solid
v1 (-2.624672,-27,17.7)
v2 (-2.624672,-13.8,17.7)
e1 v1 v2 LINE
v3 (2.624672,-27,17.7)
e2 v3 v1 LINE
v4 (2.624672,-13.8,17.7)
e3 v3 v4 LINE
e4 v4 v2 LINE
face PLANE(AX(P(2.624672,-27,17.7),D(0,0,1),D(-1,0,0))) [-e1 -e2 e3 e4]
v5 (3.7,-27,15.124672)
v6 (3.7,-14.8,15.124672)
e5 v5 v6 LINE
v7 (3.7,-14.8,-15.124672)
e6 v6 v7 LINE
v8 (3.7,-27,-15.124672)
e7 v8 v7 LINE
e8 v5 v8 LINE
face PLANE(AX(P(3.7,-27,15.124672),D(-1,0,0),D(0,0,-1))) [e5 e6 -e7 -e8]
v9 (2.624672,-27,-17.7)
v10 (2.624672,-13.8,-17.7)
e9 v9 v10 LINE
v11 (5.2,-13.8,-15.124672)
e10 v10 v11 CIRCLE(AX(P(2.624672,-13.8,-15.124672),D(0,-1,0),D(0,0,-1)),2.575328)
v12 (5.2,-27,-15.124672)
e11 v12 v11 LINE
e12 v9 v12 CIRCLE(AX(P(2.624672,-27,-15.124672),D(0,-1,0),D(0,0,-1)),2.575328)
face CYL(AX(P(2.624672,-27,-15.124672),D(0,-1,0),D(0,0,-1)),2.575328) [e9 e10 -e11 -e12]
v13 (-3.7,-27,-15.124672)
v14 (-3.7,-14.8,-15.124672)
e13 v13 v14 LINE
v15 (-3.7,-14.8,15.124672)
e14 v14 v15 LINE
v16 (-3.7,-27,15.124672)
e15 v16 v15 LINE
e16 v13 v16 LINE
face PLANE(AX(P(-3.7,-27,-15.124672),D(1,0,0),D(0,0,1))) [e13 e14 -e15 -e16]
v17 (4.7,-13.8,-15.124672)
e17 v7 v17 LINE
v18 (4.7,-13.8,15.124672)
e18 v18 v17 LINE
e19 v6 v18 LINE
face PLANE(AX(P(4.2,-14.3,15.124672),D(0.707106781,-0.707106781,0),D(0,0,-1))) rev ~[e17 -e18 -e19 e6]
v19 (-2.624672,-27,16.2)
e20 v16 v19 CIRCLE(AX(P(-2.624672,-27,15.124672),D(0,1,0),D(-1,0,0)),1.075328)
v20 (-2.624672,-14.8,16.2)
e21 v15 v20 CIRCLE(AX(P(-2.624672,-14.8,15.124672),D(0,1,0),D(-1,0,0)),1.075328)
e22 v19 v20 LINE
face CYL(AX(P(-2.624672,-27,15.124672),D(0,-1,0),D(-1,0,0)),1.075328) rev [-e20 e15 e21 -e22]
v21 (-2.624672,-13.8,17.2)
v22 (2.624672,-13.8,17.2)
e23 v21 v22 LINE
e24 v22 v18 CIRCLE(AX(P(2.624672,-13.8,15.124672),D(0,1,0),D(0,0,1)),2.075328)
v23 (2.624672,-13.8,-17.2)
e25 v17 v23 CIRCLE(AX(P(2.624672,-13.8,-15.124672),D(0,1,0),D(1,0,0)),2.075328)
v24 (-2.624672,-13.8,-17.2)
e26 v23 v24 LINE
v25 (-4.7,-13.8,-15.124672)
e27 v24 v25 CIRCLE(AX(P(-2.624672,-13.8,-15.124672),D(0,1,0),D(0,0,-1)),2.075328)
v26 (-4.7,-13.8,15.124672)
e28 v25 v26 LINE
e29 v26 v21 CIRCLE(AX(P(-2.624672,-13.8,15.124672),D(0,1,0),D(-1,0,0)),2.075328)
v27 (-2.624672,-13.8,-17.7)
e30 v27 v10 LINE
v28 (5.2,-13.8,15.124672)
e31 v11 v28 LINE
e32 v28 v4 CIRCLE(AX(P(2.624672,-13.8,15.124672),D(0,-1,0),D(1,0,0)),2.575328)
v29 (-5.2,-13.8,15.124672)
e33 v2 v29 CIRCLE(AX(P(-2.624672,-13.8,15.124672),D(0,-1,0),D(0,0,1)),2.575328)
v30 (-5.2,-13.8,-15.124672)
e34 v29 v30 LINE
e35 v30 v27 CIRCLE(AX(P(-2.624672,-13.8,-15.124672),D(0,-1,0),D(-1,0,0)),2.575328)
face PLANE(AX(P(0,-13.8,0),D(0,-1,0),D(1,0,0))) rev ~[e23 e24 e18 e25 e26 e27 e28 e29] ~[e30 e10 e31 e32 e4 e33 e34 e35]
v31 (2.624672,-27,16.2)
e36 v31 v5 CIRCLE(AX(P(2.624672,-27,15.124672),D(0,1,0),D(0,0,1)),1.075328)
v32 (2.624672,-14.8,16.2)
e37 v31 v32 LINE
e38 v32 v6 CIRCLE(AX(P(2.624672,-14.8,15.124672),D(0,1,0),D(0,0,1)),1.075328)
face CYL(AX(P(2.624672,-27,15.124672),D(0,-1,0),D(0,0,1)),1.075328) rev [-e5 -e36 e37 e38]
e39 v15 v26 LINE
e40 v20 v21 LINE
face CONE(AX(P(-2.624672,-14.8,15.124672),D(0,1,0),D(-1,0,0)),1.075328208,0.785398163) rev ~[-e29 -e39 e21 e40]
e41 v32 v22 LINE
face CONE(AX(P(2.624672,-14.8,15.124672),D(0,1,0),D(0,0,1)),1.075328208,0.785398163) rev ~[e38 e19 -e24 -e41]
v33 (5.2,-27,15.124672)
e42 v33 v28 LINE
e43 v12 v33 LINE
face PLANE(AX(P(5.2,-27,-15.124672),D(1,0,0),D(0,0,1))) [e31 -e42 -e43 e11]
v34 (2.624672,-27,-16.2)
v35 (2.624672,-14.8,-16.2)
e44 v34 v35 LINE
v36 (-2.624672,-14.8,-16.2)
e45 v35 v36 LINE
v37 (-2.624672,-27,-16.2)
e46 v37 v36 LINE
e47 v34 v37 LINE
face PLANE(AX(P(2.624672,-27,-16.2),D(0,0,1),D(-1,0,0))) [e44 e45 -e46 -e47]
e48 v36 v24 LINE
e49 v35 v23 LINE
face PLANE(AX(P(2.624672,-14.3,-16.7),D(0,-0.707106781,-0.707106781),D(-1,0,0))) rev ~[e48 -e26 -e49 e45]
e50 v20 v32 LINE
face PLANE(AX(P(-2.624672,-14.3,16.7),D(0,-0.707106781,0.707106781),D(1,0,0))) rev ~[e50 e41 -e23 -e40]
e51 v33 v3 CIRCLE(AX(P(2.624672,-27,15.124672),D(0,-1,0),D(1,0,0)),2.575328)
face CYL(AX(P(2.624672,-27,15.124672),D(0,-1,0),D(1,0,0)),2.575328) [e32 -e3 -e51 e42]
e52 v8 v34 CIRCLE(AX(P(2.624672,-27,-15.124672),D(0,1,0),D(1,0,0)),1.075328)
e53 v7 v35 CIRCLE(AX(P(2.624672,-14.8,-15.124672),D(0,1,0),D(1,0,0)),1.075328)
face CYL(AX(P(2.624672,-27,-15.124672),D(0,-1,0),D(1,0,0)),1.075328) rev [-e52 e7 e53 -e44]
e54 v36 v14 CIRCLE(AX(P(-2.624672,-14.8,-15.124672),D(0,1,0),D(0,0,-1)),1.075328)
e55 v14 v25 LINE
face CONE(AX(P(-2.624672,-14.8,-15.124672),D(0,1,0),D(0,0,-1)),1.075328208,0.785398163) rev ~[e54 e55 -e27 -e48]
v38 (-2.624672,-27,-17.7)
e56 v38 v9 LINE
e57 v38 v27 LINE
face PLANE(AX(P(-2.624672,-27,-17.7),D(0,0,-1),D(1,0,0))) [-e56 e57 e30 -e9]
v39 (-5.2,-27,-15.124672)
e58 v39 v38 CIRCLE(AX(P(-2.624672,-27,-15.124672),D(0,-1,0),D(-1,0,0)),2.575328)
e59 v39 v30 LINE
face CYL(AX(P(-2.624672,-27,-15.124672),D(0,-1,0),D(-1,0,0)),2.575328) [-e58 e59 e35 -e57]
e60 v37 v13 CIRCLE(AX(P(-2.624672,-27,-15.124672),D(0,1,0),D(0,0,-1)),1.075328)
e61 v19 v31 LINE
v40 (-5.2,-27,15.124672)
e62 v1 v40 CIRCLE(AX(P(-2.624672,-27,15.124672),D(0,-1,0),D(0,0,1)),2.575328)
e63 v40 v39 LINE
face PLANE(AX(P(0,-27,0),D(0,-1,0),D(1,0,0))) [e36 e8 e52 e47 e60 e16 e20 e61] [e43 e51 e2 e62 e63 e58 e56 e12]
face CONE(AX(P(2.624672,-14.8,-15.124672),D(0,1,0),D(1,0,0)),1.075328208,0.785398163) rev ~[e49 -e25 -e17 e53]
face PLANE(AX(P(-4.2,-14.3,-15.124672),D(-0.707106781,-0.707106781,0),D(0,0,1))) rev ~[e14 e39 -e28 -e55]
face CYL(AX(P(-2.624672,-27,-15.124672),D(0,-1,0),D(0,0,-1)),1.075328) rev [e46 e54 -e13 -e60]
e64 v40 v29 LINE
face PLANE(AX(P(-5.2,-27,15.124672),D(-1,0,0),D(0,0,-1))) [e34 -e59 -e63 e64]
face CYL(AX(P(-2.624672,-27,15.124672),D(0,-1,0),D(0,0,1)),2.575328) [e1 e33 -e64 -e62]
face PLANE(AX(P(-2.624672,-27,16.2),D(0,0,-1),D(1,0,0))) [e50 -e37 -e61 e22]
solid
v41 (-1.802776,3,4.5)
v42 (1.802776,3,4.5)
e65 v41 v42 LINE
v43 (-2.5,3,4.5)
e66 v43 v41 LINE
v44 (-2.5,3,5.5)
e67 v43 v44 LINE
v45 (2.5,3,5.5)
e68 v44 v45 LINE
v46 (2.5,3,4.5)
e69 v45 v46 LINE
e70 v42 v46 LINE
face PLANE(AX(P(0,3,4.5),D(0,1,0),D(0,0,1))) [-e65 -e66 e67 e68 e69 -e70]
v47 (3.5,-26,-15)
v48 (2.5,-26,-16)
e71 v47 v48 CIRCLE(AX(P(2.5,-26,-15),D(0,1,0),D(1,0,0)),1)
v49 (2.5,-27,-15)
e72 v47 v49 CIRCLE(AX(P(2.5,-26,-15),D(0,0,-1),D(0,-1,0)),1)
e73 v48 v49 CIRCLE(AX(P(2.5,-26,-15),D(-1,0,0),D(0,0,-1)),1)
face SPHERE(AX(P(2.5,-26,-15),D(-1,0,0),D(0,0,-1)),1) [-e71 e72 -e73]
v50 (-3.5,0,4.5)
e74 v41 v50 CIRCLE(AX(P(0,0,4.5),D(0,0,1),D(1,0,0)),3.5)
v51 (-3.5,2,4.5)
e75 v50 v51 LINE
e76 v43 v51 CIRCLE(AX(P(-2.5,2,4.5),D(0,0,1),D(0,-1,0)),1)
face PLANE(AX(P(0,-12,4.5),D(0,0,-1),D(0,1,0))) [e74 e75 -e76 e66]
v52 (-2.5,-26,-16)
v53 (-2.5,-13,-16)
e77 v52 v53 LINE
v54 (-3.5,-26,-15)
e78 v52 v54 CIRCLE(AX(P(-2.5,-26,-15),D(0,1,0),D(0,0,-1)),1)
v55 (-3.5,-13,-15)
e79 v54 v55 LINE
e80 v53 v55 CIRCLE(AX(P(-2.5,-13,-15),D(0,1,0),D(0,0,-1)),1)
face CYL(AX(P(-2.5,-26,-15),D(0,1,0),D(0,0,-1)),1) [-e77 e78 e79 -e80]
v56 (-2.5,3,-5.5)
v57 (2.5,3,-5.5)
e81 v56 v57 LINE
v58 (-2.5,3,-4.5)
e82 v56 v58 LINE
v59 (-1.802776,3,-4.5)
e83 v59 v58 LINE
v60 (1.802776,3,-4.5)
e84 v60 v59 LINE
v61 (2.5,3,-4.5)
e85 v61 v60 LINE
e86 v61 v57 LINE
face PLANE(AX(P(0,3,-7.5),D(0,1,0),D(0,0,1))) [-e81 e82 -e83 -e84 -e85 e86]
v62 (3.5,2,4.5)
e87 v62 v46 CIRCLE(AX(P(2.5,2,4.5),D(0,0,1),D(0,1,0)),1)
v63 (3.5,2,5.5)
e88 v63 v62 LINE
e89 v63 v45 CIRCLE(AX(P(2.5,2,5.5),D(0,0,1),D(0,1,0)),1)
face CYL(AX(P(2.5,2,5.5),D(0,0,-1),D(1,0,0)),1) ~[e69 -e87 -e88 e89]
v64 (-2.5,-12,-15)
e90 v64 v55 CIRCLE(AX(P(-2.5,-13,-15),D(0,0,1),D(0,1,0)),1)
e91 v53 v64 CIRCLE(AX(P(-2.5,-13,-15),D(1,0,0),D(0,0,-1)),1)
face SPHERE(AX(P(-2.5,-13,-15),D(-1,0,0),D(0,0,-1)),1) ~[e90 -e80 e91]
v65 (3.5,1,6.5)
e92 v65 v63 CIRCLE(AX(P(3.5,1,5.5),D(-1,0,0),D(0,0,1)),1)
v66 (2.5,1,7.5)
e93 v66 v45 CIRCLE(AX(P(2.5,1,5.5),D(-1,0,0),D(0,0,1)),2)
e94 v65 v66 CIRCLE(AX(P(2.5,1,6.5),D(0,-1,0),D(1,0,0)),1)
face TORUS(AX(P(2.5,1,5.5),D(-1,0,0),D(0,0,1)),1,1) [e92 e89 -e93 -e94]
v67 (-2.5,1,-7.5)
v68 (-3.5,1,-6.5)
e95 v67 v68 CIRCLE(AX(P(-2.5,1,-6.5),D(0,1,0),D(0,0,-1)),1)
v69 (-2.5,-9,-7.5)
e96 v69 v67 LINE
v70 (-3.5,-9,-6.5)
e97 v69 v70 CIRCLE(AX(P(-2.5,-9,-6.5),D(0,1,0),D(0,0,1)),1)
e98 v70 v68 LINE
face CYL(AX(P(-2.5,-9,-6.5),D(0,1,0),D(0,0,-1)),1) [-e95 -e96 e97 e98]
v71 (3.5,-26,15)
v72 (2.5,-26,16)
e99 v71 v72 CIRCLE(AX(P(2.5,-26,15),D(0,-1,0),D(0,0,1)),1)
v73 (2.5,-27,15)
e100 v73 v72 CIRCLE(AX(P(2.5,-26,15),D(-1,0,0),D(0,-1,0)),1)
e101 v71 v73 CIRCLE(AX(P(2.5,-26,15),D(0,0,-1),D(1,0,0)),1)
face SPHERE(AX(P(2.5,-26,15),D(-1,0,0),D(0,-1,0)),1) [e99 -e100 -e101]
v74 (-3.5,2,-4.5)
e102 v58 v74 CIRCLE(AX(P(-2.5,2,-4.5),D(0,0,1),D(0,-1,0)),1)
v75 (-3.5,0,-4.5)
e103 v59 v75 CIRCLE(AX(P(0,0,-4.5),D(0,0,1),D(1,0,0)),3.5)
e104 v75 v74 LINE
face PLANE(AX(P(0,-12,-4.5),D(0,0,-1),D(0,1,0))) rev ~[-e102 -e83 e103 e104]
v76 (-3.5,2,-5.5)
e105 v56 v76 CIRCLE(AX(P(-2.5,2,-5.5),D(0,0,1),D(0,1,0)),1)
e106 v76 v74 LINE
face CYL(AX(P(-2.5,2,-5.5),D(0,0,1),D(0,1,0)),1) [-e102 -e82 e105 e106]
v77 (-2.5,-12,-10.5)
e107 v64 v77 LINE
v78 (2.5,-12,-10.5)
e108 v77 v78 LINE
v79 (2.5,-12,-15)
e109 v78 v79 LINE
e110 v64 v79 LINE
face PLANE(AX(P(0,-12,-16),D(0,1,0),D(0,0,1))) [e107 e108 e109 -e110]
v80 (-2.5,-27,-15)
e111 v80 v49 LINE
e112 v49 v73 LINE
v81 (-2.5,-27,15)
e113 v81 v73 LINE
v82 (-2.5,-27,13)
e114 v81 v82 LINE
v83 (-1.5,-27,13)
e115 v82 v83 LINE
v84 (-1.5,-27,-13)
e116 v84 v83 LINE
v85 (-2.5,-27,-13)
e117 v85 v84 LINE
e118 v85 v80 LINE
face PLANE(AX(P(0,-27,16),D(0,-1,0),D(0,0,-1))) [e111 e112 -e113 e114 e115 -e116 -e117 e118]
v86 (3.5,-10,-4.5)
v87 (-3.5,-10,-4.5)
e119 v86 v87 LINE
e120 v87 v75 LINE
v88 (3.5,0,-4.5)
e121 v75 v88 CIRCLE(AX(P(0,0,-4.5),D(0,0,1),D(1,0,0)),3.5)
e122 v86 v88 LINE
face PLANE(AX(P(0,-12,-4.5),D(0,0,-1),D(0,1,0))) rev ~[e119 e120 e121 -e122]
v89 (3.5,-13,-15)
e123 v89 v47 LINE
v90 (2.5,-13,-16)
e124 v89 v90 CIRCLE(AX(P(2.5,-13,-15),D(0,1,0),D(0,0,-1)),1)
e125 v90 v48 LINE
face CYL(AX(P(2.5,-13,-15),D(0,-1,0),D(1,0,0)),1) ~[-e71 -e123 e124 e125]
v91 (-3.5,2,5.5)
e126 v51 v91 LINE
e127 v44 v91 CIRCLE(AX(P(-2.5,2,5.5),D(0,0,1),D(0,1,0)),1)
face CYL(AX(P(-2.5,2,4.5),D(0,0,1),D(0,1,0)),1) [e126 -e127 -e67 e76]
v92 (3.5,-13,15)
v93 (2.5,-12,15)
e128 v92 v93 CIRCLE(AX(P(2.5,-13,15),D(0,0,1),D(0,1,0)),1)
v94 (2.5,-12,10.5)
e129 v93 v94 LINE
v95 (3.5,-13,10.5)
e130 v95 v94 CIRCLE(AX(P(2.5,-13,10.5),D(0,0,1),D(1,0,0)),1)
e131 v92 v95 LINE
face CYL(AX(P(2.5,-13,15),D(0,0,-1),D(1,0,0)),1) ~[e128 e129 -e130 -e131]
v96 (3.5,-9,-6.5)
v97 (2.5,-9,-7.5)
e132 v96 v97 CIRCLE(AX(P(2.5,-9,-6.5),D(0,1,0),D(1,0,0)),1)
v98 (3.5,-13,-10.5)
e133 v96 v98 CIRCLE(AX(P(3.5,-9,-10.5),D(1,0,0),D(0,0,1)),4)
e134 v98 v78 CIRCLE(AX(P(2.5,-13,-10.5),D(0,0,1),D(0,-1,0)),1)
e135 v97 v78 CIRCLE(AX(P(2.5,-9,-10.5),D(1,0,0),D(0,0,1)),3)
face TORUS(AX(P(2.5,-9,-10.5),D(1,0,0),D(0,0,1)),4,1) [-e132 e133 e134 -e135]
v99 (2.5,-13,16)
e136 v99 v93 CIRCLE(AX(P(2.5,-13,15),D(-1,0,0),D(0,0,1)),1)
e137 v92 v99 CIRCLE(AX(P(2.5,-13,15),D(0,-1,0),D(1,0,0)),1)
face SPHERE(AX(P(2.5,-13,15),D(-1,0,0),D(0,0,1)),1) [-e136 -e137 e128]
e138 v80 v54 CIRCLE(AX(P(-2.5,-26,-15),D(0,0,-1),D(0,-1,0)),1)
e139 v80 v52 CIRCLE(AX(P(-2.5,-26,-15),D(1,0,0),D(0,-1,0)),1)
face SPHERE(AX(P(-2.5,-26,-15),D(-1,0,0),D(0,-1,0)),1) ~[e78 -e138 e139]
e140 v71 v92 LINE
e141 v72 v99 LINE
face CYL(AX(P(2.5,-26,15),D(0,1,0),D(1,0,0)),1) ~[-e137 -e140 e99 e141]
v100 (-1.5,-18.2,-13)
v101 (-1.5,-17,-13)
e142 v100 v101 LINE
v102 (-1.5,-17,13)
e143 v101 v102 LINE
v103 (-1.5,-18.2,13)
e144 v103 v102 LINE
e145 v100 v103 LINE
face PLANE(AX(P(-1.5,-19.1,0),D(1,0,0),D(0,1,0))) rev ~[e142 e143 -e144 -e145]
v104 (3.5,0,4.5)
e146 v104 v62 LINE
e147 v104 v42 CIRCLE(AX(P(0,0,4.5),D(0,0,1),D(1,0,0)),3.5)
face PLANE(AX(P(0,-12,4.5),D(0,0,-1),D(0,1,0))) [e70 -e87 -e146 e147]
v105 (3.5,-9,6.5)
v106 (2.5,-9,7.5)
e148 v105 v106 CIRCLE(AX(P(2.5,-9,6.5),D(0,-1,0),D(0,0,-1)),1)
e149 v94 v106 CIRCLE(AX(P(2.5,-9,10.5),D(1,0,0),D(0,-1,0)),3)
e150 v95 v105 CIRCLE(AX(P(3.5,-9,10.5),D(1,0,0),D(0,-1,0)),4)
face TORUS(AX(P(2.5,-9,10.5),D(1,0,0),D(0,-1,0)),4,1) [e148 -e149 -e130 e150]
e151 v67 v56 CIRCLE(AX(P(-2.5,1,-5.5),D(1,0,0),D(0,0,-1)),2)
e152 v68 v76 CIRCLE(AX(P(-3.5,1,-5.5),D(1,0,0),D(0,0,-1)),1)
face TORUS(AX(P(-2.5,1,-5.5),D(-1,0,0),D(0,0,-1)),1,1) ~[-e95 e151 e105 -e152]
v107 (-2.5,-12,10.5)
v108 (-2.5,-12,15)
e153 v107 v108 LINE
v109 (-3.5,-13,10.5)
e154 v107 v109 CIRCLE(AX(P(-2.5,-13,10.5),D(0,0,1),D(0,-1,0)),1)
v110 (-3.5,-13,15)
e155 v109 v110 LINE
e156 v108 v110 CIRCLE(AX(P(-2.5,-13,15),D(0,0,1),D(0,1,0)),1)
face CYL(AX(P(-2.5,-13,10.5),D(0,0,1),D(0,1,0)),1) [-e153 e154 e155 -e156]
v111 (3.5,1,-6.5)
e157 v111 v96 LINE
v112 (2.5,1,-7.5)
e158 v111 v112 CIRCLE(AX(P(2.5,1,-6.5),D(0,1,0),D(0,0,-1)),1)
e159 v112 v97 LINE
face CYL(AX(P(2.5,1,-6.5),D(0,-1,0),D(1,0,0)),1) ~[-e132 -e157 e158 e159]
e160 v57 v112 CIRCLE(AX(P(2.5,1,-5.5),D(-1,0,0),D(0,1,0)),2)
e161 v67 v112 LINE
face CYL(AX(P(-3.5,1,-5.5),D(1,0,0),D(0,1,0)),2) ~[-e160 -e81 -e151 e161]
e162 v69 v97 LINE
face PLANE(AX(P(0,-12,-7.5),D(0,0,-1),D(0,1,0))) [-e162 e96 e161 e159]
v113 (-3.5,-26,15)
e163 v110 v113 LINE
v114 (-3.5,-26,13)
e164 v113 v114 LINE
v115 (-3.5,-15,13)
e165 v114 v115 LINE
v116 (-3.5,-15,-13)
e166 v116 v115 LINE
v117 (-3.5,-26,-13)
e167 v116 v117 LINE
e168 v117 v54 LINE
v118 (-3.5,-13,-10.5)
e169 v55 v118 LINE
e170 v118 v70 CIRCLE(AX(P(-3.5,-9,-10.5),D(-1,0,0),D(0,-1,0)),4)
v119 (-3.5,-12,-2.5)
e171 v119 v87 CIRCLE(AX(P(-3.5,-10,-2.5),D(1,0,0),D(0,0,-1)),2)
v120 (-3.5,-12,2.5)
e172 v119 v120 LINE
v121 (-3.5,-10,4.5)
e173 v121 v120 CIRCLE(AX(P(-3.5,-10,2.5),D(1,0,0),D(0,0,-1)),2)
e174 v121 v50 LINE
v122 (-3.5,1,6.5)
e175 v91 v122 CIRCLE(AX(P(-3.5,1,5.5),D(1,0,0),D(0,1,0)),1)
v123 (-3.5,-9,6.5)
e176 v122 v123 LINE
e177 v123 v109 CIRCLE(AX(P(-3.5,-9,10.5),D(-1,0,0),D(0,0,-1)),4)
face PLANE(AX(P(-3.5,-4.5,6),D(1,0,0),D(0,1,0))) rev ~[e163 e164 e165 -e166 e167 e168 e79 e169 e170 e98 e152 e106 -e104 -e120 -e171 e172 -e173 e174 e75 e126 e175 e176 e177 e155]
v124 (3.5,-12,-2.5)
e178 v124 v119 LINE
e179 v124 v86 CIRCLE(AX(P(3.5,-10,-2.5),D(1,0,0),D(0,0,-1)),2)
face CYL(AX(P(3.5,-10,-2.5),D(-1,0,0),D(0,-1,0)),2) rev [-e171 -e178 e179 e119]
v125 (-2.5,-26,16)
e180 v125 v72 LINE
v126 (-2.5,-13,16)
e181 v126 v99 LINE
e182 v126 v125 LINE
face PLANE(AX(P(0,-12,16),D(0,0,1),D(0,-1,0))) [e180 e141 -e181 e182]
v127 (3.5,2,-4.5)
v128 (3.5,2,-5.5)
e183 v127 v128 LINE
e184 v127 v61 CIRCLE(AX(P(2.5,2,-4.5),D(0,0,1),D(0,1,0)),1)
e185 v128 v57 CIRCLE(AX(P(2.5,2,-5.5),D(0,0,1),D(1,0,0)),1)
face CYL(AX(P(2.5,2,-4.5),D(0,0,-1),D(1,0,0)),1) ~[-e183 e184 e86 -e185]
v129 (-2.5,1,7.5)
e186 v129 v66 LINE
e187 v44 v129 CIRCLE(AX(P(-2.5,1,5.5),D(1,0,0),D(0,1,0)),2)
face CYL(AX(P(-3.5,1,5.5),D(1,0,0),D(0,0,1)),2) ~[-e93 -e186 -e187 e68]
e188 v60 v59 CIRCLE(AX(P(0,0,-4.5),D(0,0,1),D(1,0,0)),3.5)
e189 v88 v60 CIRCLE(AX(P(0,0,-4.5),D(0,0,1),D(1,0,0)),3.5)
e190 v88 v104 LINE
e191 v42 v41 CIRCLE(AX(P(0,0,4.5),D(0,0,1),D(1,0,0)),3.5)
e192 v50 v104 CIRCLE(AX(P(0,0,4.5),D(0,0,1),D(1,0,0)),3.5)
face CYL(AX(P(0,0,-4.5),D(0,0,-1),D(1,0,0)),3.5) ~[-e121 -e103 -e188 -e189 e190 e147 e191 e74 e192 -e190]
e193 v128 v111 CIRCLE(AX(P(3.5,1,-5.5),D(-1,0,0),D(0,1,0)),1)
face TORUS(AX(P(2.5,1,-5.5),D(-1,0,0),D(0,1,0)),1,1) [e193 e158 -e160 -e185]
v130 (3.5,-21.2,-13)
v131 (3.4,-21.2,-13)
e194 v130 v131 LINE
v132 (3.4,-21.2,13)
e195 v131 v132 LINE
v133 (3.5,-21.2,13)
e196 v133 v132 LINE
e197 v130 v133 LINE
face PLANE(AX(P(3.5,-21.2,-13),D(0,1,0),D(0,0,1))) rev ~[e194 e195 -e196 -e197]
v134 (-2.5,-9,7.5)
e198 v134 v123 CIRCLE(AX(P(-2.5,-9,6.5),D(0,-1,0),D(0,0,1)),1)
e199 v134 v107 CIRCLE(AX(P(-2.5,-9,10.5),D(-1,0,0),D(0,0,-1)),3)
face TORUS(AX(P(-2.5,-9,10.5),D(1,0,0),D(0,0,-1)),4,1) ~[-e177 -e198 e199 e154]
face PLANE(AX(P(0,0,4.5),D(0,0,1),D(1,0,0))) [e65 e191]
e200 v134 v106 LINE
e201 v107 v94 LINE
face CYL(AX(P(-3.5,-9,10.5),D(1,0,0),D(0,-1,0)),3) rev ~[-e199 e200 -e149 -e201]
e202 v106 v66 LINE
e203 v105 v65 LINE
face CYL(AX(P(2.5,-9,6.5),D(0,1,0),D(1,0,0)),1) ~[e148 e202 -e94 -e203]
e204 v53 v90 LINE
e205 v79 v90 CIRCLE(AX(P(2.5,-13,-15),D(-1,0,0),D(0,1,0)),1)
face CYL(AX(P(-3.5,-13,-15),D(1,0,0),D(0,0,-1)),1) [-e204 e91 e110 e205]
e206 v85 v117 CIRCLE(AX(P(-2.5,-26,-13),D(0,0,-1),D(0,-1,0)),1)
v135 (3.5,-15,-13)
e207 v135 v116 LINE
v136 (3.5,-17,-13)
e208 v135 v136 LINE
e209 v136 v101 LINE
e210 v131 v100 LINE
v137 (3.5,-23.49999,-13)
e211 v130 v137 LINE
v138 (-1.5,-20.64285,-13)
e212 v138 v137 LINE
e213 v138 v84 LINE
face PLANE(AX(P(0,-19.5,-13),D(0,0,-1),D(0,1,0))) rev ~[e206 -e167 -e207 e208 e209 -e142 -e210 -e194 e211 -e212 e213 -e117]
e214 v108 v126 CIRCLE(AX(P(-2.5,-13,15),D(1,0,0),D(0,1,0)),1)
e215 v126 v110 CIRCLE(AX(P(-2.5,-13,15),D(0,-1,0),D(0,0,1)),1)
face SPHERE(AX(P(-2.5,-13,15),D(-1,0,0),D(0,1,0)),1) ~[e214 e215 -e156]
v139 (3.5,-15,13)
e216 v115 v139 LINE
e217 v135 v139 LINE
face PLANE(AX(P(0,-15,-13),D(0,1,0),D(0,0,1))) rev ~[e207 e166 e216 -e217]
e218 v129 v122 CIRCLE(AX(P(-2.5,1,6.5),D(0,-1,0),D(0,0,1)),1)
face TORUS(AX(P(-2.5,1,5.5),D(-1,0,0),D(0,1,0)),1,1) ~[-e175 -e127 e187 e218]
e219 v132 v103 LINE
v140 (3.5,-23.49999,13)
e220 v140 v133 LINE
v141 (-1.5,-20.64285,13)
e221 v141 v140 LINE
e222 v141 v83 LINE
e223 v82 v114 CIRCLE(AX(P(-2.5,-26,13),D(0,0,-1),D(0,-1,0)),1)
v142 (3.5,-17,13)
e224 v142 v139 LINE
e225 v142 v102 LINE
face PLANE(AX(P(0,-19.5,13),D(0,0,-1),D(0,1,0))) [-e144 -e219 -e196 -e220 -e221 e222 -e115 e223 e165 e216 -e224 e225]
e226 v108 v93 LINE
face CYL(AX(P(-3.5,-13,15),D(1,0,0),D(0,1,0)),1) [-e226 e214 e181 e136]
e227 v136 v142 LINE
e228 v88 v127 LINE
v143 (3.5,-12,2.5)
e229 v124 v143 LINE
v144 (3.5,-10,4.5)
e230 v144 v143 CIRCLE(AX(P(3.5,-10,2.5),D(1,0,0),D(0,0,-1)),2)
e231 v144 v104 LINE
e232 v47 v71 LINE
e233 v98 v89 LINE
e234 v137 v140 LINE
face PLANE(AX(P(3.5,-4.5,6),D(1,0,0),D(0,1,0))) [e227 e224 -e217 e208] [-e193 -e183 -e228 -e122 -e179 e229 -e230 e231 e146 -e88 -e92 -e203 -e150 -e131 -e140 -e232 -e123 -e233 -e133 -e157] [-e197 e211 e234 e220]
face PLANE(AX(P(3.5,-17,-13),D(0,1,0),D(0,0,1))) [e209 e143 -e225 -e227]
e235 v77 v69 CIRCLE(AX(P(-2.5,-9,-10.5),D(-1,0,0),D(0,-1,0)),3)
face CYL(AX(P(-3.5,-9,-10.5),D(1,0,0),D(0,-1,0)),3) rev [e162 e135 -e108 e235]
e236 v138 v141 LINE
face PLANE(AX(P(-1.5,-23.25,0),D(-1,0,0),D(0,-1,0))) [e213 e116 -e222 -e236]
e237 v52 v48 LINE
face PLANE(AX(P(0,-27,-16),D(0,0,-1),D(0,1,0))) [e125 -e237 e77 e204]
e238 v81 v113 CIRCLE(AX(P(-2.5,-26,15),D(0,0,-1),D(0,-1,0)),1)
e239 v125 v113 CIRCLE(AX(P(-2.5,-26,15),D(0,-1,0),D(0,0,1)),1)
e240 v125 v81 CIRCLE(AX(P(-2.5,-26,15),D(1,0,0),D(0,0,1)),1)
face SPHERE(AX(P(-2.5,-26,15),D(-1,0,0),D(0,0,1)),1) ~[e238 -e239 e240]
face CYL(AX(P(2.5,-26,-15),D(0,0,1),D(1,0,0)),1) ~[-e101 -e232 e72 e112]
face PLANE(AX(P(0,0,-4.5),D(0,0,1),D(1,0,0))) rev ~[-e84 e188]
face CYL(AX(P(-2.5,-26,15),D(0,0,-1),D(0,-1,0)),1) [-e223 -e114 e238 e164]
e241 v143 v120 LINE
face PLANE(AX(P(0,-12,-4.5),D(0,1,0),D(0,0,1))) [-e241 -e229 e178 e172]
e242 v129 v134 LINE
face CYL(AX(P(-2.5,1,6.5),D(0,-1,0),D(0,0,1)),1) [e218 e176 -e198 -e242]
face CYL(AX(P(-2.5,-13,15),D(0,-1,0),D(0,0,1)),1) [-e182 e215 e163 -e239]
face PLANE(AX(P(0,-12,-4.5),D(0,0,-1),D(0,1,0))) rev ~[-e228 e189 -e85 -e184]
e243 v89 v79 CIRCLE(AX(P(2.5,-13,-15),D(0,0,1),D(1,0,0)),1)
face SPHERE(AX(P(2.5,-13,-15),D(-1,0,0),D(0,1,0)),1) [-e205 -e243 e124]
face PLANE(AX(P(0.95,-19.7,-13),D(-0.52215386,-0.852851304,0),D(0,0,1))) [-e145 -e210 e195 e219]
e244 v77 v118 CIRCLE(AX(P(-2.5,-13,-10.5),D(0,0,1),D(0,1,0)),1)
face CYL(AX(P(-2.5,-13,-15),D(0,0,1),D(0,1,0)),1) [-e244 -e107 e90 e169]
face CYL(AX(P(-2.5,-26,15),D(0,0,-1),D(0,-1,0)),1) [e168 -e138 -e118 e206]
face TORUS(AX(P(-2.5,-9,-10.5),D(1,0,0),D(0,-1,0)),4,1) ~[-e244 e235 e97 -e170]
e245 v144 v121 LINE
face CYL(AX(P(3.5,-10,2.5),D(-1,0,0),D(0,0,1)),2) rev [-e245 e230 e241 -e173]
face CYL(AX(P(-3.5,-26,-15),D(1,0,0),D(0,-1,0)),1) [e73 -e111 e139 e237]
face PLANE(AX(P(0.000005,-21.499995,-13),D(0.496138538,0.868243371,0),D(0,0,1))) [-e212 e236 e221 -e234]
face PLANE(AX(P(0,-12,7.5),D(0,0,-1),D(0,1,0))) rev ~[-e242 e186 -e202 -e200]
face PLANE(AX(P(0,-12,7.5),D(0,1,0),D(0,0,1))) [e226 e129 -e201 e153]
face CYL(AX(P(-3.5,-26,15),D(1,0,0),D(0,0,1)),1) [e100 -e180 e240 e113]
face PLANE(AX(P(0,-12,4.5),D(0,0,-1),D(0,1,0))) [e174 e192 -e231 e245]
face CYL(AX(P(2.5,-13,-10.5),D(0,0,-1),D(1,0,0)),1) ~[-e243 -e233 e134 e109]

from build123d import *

# Parameters (mm, degrees)
F0_W      = 15
F0_H      = 3
F0_W_2    = 4.5
F0_H_2    = 26
F1_DEPTH  = 3.5
F2_R      = 3.5
F3_DEPTH  = 9
F4_R      = 1
F5_R      = 3
F6_R      = 2
F7_R      = 1
F8_SIZE2  = 3.99999
F8_SIZE   = 6.99999
F9_W      = 4.2
F9_H      = 26
F10_DEPTH = 5
F11_SIZE2 = 3
F11_SIZE  = 4.9
F12_W     = 7.5
F12_H     = 26
F13_DEPTH = 2
F16_DEPTH = 13.2
F17_SIZE  = 1


# Not quite as in the source:
# - a fillet or chamfer is up to 0.001 mm smaller than in the source, because OpenCascade refuses the exact size


with BuildPart() as f1:
    # F0 (on Right) → F1 (new body, symmetric)
    with BuildSketch(Plane.YZ):
        with Locations((-4.5, 6)):
            Rectangle(F0_W, F0_H)
        Polygon((-12, -4.5), (-12, 4.5), (-12, 7.5), (-12, 16), (-27, 16), (-27, -16), (-12, -16), (-12, -7.5), align=None)
        with Locations((-17.25, 0)):
            Rectangle(F0_W_2, F0_H_2, mode=Mode.SUBTRACT)
        with Locations((-4.5, -6)):
            Rectangle(F0_W, F0_H)
    extrude(amount=F1_DEPTH, both=True)

    # F2 (on face) → F3 (join, through all)
    with BuildSketch(Plane.XY.offset(-4.5)):
        Circle(F2_R)
    extrude(amount=F3_DEPTH)

    # F4
    f4_edges = [f1.edges().sort_by_distance(p)[0] for p in [
        (0, -12, 16),
        (0, -12, -16),
        (0, -27, 16),
        (0, -27, -16),
    ]]
    fillet(f4_edges, radius=F4_R)

    # F5
    f5_edges = [f1.edges().sort_by_distance(p)[0] for p in [
        (0, -12, 7.5),
        (0, -12, -7.5),
    ]]
    fillet(f5_edges, radius=F5_R)

    # F6
    f6_edges = [f1.edges().sort_by_distance(p)[0] for p in [
        (0, 3, 7.5),
        (0, 3, -7.5),
        (0, -12, -4.5),
        (0, -12, 4.5),
    ]]
    fillet(f6_edges, radius=F6_R)

    # F7
    f7_edges = [f1.edges().sort_by_distance(p)[0] for p in [
        (3.5, 2.414214, 6.914214),
        (3.5, 2.414214, -6.914214),
        (-3.5, -19.5, -16),
        (-3.5, -19.5, 16),
    ]]
    fillet(f7_edges, radius=F7_R)

    # F8 (size 7 and 4 in the source; OpenCascade refuses exactly that, so slightly less here)
    f8_edges = [f1.edges().sort_by_distance(p)[0] for p in [
        (3.5, -19.5, 0),
    ]]
    f8_side = f1.faces().sort_by_distance((0, -19.5, 0))[0]
    chamfer(f8_edges, length=F8_SIZE, length2=F8_SIZE2, reference=f8_side)

    # F12 (on face) → F13 (cut)
    with BuildSketch(Plane(origin=(-3.5, 0, 0), x_dir=(0, -1, 0), z_dir=(-1, 0, 0))):
        with Locations((23.25, 0)):
            Rectangle(F12_W, F12_H)
    extrude(amount=-F13_DEPTH, mode=Mode.SUBTRACT)


with BuildPart() as f10:
    # F9 (on face) → F10 (new body)
    with BuildSketch(Plane.YZ.offset(3.5)):
        with Locations((-19.1, 0)):
            Rectangle(F9_W, F9_H)
    extrude(amount=-F10_DEPTH)

    # F11
    f11_edges = [f10.edges().sort_by_distance(p)[0] for p in [
        (-1.5, -21.2, 0),
    ]]
    f11_side = f10.faces().sort_by_distance((1, -21.2, 0))[0]
    chamfer(f11_edges, length=F11_SIZE, length2=F11_SIZE2, reference=f11_side)


with BuildPart() as f1_1:
    add(f1.part)

    # F14: union F10
    add(f10.part)


with BuildPart() as f16:
    # F15 (on face) → F16 (new body)
    with BuildSketch(Plane.XZ.offset(27)):
        with BuildLine():
            Line((2.6246717919, 17.7), (-2.6246717919, 17.7))
            ThreePointArc((-2.6246717919, 17.7), (-4.4457038316, 16.9457038316), (-5.2, 15.1246717919))
            Line((-5.2, 15.1246717919), (-5.2, -15.1246717919))
            ThreePointArc((-5.2, -15.1246717919), (-4.4457038316, -16.9457038316), (-2.6246717919, -17.7))
            Line((-2.6246717919, -17.7), (2.6246717919, -17.7))
            ThreePointArc((2.6246717919, -17.7), (4.4457038316, -16.9457038316), (5.2, -15.1246717919))
            Line((5.2, -15.1246717919), (5.2, 15.1246717919))
            ThreePointArc((5.2, 15.1246717919), (4.4457038316, 16.9457038316), (2.6246717919, 17.7))
        make_face()
        with BuildLine():
            Line((-2.6246717919, 16.2), (2.6246717919, 16.2))
            ThreePointArc((2.6246717919, 16.2), (3.3850436598, 15.8850436598), (3.7, 15.1246717919))
            Line((3.7, 15.1246717919), (3.7, -15.1246717919))
            ThreePointArc((3.7, -15.1246717919), (3.3850436598, -15.8850436598), (2.6246717919, -16.2))
            Line((2.6246717919, -16.2), (-2.6246717919, -16.2))
            ThreePointArc((-2.6246717919, -16.2), (-3.3850436598, -15.8850436598), (-3.7, -15.1246717919))
            Line((-3.7, -15.1246717919), (-3.7, 15.1246717919))
            ThreePointArc((-3.7, 15.1246717919), (-3.3850436598, 15.8850436598), (-2.6246717919, 16.2))
        make_face(mode=Mode.SUBTRACT)
    extrude(amount=-F16_DEPTH)

    # F17
    f17_edges = [f16.edges().sort_by_distance(p)[0] for p in [
        (-3.7, -13.8, 0),
    ]]
    chamfer(f17_edges, length=F17_SIZE)


solid = Compound([f1_1.part, f16.part])
